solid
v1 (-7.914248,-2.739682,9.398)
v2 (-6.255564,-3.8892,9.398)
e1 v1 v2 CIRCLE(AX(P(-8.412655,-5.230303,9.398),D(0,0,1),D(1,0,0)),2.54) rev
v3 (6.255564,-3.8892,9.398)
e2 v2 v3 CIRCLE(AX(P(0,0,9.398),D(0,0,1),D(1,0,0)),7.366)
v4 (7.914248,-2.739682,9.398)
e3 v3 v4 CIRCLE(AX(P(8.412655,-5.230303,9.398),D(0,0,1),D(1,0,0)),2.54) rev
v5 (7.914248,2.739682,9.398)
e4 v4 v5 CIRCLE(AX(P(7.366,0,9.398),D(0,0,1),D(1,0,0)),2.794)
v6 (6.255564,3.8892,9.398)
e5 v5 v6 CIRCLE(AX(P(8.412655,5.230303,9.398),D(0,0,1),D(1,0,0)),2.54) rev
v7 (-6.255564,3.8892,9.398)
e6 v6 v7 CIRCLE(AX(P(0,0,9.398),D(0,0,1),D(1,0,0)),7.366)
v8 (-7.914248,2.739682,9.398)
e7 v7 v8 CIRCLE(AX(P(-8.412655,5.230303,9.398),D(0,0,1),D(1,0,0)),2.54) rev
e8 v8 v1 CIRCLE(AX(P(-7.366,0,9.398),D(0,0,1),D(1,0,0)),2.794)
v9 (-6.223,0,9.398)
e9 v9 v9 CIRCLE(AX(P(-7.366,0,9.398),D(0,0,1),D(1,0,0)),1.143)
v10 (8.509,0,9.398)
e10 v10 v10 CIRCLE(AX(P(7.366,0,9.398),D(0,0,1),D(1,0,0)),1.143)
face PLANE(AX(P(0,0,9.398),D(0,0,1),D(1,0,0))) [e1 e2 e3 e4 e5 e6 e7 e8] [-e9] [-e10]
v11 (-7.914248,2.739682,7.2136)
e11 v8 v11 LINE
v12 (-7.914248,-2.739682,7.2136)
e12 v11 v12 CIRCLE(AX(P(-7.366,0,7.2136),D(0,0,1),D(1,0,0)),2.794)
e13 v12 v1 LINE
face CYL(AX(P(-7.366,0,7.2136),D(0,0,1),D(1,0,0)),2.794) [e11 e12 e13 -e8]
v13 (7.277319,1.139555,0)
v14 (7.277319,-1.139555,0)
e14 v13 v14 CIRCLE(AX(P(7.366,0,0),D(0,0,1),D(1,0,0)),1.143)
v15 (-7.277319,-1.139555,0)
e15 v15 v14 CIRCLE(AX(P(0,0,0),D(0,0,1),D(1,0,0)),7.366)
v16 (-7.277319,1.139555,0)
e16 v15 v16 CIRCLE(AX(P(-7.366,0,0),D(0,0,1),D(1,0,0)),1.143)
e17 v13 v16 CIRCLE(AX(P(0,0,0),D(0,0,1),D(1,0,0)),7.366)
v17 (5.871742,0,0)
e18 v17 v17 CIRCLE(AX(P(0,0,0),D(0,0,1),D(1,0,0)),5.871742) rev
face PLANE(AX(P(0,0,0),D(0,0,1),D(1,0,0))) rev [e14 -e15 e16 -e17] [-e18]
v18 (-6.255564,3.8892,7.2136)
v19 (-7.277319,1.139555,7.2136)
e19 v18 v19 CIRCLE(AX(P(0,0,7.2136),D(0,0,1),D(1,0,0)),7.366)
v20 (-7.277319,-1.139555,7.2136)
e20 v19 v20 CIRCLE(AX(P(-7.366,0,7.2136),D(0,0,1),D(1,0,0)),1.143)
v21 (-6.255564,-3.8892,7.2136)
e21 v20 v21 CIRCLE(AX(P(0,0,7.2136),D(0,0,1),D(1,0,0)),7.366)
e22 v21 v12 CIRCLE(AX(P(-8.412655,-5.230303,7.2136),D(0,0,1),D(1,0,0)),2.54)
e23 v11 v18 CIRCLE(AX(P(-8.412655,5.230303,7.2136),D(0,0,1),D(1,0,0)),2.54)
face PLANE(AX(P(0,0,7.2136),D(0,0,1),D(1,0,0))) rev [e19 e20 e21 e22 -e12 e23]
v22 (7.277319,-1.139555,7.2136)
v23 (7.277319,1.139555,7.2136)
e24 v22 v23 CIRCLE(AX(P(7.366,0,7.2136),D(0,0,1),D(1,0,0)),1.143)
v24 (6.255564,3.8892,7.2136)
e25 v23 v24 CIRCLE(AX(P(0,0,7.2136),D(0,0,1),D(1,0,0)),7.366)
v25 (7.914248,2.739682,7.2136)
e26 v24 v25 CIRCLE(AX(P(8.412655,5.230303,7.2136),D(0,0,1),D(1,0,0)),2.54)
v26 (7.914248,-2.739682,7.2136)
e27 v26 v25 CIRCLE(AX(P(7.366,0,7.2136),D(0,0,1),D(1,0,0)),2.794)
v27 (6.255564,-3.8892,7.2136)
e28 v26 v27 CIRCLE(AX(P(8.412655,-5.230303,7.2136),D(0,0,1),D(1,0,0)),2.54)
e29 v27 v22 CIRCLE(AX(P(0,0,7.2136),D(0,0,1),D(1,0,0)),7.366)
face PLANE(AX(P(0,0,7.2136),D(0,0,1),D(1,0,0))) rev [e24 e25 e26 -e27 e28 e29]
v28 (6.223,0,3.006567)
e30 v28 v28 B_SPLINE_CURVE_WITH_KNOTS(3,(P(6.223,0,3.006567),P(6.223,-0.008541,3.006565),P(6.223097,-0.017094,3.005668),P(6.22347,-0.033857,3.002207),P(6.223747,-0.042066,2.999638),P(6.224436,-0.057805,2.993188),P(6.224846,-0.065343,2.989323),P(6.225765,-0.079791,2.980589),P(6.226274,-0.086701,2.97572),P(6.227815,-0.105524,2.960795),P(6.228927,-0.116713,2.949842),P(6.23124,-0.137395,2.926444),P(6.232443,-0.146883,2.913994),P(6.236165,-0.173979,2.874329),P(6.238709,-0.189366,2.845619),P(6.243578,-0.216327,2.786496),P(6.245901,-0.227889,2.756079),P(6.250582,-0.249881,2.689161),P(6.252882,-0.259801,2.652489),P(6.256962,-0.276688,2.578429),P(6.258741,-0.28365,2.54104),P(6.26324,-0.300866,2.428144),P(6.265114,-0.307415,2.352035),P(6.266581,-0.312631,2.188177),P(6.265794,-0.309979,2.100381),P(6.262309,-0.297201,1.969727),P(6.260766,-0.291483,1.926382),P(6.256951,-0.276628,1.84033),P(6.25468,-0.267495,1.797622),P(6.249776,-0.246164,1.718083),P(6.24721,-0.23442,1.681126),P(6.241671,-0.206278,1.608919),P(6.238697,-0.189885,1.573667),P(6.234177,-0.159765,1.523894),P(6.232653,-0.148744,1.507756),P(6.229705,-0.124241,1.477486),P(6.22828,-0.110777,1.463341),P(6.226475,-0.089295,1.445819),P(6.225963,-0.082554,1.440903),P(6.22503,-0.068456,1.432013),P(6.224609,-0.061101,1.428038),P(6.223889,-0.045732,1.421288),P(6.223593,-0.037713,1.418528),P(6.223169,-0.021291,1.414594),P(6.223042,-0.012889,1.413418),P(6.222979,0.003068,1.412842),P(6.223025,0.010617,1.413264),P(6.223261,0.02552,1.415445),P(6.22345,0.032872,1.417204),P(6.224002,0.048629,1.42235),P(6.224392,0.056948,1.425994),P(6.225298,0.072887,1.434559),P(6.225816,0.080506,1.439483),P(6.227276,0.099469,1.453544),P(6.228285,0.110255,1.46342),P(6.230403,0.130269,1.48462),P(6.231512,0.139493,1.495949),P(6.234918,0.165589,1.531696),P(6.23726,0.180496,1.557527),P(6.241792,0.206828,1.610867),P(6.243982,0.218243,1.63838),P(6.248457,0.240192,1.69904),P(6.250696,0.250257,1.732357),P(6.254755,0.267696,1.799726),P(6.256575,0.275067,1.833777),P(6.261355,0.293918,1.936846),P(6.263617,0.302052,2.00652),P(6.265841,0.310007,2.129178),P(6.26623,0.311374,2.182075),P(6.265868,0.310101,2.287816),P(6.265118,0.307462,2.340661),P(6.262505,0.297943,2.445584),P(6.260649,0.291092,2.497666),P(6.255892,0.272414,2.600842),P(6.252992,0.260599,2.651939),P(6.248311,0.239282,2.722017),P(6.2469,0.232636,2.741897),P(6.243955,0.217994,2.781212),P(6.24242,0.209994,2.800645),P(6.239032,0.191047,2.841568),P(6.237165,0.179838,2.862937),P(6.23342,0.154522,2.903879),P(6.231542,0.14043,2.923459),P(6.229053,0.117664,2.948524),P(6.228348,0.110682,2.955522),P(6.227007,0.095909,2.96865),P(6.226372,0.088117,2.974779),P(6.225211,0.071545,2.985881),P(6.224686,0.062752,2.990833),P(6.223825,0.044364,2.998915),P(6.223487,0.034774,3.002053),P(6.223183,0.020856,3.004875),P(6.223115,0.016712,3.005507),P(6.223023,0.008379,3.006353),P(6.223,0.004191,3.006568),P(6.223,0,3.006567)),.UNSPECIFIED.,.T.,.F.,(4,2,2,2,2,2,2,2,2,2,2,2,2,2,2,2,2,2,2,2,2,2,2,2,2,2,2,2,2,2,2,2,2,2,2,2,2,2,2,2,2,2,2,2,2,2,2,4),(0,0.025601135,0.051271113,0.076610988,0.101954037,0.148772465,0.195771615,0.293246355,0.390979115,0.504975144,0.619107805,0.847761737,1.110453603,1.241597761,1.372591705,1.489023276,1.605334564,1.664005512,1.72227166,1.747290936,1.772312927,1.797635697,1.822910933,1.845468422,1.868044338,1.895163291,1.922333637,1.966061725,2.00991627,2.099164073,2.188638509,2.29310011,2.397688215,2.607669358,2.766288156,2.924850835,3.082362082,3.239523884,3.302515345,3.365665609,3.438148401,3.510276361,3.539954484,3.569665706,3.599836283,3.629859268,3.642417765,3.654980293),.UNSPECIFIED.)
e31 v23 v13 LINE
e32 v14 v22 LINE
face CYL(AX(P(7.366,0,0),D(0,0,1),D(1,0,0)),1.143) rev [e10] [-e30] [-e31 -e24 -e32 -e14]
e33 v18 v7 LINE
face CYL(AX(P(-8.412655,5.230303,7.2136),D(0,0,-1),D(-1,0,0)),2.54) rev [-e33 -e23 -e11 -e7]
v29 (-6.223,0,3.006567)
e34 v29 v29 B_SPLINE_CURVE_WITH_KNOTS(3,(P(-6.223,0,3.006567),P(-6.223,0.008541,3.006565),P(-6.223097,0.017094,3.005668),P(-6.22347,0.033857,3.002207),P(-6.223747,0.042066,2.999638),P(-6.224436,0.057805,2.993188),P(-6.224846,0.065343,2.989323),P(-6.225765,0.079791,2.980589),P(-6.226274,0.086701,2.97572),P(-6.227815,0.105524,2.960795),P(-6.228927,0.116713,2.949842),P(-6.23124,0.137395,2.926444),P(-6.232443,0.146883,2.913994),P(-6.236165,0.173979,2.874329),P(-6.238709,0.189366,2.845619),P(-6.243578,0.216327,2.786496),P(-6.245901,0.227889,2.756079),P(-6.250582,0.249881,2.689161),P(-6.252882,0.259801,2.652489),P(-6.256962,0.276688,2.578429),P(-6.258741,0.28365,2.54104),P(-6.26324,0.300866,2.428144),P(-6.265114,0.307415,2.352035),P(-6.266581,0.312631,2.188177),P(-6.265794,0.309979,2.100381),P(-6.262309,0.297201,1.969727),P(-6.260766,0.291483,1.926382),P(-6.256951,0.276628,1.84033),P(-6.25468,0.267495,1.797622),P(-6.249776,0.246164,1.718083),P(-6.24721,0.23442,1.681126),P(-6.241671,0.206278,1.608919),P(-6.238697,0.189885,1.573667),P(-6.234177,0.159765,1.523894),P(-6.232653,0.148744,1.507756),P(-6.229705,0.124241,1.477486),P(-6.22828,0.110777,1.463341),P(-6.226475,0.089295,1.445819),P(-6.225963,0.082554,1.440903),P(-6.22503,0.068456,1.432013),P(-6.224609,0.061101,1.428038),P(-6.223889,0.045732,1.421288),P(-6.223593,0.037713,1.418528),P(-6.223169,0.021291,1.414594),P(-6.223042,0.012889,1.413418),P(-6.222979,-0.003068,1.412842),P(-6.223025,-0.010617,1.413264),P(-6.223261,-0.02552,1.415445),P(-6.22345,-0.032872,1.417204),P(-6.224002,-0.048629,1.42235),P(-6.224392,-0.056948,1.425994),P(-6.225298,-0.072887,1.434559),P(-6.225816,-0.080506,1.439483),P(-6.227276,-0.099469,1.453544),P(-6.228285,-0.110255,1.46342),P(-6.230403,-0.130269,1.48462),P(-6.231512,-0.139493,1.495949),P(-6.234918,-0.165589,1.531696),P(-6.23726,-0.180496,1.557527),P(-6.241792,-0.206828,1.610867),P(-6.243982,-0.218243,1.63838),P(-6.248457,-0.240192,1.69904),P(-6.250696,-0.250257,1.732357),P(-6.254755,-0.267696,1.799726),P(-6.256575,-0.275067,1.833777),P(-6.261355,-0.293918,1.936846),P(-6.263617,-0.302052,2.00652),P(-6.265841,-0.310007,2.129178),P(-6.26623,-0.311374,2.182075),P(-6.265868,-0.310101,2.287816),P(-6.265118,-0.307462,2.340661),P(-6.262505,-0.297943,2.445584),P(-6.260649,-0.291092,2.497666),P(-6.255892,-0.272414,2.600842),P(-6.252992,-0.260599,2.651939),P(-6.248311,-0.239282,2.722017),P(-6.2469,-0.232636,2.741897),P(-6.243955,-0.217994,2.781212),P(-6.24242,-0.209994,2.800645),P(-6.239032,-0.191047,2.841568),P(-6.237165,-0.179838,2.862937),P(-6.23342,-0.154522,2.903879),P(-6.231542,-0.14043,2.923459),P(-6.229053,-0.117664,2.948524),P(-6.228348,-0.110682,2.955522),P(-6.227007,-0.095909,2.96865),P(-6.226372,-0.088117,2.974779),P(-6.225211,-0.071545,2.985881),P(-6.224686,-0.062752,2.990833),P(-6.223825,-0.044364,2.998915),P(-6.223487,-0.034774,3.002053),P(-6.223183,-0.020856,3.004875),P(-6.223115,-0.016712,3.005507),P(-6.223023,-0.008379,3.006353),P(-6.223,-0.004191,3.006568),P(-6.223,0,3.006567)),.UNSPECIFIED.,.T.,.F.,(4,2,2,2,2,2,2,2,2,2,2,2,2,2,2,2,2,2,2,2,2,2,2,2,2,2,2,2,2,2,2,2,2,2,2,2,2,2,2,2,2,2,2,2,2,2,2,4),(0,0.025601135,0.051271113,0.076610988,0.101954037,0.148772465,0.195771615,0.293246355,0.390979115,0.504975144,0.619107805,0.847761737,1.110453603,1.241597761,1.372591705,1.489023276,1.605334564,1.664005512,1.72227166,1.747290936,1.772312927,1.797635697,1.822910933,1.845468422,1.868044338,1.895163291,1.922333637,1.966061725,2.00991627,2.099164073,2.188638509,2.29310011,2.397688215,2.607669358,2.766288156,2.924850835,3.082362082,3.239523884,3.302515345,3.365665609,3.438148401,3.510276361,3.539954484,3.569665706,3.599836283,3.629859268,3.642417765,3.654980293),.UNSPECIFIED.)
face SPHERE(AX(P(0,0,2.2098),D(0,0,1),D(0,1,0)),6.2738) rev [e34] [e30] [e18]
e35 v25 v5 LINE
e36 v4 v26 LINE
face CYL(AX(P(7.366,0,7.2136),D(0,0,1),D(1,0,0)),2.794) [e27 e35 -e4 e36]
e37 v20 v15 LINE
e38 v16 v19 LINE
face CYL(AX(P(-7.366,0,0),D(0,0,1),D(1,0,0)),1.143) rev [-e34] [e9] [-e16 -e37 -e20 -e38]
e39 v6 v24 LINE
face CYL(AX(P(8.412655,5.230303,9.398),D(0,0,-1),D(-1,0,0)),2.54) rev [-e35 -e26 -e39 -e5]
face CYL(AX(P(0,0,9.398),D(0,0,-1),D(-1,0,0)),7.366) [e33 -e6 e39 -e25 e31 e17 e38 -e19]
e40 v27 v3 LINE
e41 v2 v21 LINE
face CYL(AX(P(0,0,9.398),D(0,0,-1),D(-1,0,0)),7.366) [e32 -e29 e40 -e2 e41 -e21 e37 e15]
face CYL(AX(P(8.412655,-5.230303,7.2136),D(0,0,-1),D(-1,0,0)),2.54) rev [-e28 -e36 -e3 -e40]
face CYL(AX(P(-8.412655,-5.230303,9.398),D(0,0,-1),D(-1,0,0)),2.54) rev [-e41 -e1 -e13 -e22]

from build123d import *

# Parameters (mm, degrees)
ESQUISSE1_R             = 7.366
BOSS_EXTRU_1_DEPTH      = 9.398
BOSS_EXTRU_2_START      = -2.1844
BOSS_EXTRU_2_DEPTH      = 2.1844
CONG_1_R                = 2.54
ESQUISSE3_R             = 1.143
ENL_V_MAT_EXTRU_2_DEPTH = 16.678200152


with BuildPart() as part:
    # Esquisse1 → Boss.-Extru.1 (new body)
    with BuildSketch(Plane.XY):
        Circle(ESQUISSE1_R)
    extrude(amount=BOSS_EXTRU_1_DEPTH)

    # Esquisse2 → Boss.-Extru.2 (add)
    with BuildSketch(Plane.XY.offset(9.398).offset(BOSS_EXTRU_2_START)):
        with BuildLine():
            Line((7.366, 2.794), (6.815535195, 2.794))
            ThreePointArc((6.815535195, 2.794), (7.22707369, 1.423854584), (7.366, 0))
            Line((7.366, 0), (10.16, 0))
            ThreePointArc((10.16, 0), (9.341656347, 1.975656347), (7.366, 2.794))
        make_face()
        with BuildLine():
            Line((10.16, 0), (7.366, 0))
            ThreePointArc((7.366, 0), (7.22707369, -1.423854584), (6.815535195, -2.794))
            Line((6.815535195, -2.794), (7.366, -2.794))
            ThreePointArc((7.366, -2.794), (9.341656347, -1.975656347), (10.16, 0))
        make_face()
        with BuildLine():
            Line((-7.366, 0), (-10.16, 0))
            ThreePointArc((-10.16, 0), (-9.341656347, -1.975656347), (-7.366, -2.794))
            Line((-7.366, -2.794), (-6.815535195, -2.794))
            ThreePointArc((-6.815535195, -2.794), (-7.22707369, -1.423854584), (-7.366, 0))
        make_face()
        with BuildLine():
            Line((-6.815535195, 2.794), (-7.366, 2.794))
            ThreePointArc((-7.366, 2.794), (-9.341656347, 1.975656347), (-10.16, 0))
            Line((-10.16, 0), (-7.366, 0))
            ThreePointArc((-7.366, 0), (-7.22707369, 1.423854584), (-6.815535195, 2.794))
        make_face()
    extrude(amount=BOSS_EXTRU_2_DEPTH)

    # Congé1
    # the kernel refuses this fillet: 2.54 mm, written as the material it adds along each edge
    with BuildSketch(Plane(origin=(6.815535195, 2.794, 7.2136), x_dir=(-0.45524151464262924, 0.8903679932173465, 0), z_dir=(0, 0, 1)), Plane(origin=(-6.815535195, -2.794, 7.2136), x_dir=(0.4552415146426176, -0.8903679932173524, 0), z_dir=(0, 0, 1))) as cong_1_piece_1:
        with BuildLine():
            CenterArc((1.442130851, -2.531130754), CONG_1_R, 94.789504406, 46.813825589)
            Line((-0.548542223, -0.953531086), (-0.74760953, -0.795771119))
            ThreePointArc((-0.74760953, -0.795771119), (-0.476747902, -0.374484899), (-0.22615347, 0.115631345))
            Line((-0.22615347, 0.115631345), (0.021207807, 0.253113075))
            ThreePointArc((0.021207807, 0.253113075), (0.615026392, 0.228279187), (1.208844978, 0.253113075))
            Line((1.208844978, 0.253113075), (1.230052785, 0))
        make_face()
    extrude(amount=2.1844)
    with BuildSketch(Plane(origin=(6.815535195, -2.794, 7.2136), x_dir=(-0.4552415146426287, -0.8903679932173468, 0), z_dir=(0, 0, 1)), Plane(origin=(-6.815535195, 2.794, 7.2136), x_dir=(0.45524151464261825, 0.890367993217352, 0), z_dir=(0, 0, 1))) as cong_1_piece_2:
        with BuildLine():
            CenterArc((1.442130851, 2.531130754), CONG_1_R, 218.396670004, 46.813825589)
            Line((-0.548542223, 0.953531086), (-0.74760953, 0.795771119))
            ThreePointArc((-0.74760953, 0.795771119), (-0.476747902, 0.374484899), (-0.22615347, -0.115631345))
            Line((-0.22615347, -0.115631345), (0.021207807, -0.253113075))
            ThreePointArc((0.021207807, -0.253113075), (0.615026392, -0.228279187), (1.208844978, -0.253113075))
            Line((1.208844978, -0.253113075), (1.230052785, 0))
        make_face()
    extrude(amount=2.1844)

    # Esquisse3 → Enlèv. mat.-Extru.2 (cut, through all)
    with BuildSketch(Plane.XY.offset(9.398)):
        with Locations((-7.366, 0)):
            Circle(ESQUISSE3_R)
        with Locations((7.366, 0)):
            Circle(ESQUISSE3_R)
    extrude(amount=-ENL_V_MAT_EXTRU_2_DEPTH, mode=Mode.SUBTRACT)

    # Esquisse4 → Cut-Revolve1 (revolve, cut)
    with BuildSketch(Plane(origin=(0, 0, 0), x_dir=(0, 0, -1), z_dir=(1, 0, 0))):
        with BuildLine():
            Line((-8.4836, 0), (4.064, 0))
            ThreePointArc((4.064, 0), (-2.2098, 6.2738), (-8.4836, 0))
        make_face()
    revolve(axis=Axis((0, 0, 7.037287666), (0, 0, -1)), mode=Mode.SUBTRACT)


solid = part.part
